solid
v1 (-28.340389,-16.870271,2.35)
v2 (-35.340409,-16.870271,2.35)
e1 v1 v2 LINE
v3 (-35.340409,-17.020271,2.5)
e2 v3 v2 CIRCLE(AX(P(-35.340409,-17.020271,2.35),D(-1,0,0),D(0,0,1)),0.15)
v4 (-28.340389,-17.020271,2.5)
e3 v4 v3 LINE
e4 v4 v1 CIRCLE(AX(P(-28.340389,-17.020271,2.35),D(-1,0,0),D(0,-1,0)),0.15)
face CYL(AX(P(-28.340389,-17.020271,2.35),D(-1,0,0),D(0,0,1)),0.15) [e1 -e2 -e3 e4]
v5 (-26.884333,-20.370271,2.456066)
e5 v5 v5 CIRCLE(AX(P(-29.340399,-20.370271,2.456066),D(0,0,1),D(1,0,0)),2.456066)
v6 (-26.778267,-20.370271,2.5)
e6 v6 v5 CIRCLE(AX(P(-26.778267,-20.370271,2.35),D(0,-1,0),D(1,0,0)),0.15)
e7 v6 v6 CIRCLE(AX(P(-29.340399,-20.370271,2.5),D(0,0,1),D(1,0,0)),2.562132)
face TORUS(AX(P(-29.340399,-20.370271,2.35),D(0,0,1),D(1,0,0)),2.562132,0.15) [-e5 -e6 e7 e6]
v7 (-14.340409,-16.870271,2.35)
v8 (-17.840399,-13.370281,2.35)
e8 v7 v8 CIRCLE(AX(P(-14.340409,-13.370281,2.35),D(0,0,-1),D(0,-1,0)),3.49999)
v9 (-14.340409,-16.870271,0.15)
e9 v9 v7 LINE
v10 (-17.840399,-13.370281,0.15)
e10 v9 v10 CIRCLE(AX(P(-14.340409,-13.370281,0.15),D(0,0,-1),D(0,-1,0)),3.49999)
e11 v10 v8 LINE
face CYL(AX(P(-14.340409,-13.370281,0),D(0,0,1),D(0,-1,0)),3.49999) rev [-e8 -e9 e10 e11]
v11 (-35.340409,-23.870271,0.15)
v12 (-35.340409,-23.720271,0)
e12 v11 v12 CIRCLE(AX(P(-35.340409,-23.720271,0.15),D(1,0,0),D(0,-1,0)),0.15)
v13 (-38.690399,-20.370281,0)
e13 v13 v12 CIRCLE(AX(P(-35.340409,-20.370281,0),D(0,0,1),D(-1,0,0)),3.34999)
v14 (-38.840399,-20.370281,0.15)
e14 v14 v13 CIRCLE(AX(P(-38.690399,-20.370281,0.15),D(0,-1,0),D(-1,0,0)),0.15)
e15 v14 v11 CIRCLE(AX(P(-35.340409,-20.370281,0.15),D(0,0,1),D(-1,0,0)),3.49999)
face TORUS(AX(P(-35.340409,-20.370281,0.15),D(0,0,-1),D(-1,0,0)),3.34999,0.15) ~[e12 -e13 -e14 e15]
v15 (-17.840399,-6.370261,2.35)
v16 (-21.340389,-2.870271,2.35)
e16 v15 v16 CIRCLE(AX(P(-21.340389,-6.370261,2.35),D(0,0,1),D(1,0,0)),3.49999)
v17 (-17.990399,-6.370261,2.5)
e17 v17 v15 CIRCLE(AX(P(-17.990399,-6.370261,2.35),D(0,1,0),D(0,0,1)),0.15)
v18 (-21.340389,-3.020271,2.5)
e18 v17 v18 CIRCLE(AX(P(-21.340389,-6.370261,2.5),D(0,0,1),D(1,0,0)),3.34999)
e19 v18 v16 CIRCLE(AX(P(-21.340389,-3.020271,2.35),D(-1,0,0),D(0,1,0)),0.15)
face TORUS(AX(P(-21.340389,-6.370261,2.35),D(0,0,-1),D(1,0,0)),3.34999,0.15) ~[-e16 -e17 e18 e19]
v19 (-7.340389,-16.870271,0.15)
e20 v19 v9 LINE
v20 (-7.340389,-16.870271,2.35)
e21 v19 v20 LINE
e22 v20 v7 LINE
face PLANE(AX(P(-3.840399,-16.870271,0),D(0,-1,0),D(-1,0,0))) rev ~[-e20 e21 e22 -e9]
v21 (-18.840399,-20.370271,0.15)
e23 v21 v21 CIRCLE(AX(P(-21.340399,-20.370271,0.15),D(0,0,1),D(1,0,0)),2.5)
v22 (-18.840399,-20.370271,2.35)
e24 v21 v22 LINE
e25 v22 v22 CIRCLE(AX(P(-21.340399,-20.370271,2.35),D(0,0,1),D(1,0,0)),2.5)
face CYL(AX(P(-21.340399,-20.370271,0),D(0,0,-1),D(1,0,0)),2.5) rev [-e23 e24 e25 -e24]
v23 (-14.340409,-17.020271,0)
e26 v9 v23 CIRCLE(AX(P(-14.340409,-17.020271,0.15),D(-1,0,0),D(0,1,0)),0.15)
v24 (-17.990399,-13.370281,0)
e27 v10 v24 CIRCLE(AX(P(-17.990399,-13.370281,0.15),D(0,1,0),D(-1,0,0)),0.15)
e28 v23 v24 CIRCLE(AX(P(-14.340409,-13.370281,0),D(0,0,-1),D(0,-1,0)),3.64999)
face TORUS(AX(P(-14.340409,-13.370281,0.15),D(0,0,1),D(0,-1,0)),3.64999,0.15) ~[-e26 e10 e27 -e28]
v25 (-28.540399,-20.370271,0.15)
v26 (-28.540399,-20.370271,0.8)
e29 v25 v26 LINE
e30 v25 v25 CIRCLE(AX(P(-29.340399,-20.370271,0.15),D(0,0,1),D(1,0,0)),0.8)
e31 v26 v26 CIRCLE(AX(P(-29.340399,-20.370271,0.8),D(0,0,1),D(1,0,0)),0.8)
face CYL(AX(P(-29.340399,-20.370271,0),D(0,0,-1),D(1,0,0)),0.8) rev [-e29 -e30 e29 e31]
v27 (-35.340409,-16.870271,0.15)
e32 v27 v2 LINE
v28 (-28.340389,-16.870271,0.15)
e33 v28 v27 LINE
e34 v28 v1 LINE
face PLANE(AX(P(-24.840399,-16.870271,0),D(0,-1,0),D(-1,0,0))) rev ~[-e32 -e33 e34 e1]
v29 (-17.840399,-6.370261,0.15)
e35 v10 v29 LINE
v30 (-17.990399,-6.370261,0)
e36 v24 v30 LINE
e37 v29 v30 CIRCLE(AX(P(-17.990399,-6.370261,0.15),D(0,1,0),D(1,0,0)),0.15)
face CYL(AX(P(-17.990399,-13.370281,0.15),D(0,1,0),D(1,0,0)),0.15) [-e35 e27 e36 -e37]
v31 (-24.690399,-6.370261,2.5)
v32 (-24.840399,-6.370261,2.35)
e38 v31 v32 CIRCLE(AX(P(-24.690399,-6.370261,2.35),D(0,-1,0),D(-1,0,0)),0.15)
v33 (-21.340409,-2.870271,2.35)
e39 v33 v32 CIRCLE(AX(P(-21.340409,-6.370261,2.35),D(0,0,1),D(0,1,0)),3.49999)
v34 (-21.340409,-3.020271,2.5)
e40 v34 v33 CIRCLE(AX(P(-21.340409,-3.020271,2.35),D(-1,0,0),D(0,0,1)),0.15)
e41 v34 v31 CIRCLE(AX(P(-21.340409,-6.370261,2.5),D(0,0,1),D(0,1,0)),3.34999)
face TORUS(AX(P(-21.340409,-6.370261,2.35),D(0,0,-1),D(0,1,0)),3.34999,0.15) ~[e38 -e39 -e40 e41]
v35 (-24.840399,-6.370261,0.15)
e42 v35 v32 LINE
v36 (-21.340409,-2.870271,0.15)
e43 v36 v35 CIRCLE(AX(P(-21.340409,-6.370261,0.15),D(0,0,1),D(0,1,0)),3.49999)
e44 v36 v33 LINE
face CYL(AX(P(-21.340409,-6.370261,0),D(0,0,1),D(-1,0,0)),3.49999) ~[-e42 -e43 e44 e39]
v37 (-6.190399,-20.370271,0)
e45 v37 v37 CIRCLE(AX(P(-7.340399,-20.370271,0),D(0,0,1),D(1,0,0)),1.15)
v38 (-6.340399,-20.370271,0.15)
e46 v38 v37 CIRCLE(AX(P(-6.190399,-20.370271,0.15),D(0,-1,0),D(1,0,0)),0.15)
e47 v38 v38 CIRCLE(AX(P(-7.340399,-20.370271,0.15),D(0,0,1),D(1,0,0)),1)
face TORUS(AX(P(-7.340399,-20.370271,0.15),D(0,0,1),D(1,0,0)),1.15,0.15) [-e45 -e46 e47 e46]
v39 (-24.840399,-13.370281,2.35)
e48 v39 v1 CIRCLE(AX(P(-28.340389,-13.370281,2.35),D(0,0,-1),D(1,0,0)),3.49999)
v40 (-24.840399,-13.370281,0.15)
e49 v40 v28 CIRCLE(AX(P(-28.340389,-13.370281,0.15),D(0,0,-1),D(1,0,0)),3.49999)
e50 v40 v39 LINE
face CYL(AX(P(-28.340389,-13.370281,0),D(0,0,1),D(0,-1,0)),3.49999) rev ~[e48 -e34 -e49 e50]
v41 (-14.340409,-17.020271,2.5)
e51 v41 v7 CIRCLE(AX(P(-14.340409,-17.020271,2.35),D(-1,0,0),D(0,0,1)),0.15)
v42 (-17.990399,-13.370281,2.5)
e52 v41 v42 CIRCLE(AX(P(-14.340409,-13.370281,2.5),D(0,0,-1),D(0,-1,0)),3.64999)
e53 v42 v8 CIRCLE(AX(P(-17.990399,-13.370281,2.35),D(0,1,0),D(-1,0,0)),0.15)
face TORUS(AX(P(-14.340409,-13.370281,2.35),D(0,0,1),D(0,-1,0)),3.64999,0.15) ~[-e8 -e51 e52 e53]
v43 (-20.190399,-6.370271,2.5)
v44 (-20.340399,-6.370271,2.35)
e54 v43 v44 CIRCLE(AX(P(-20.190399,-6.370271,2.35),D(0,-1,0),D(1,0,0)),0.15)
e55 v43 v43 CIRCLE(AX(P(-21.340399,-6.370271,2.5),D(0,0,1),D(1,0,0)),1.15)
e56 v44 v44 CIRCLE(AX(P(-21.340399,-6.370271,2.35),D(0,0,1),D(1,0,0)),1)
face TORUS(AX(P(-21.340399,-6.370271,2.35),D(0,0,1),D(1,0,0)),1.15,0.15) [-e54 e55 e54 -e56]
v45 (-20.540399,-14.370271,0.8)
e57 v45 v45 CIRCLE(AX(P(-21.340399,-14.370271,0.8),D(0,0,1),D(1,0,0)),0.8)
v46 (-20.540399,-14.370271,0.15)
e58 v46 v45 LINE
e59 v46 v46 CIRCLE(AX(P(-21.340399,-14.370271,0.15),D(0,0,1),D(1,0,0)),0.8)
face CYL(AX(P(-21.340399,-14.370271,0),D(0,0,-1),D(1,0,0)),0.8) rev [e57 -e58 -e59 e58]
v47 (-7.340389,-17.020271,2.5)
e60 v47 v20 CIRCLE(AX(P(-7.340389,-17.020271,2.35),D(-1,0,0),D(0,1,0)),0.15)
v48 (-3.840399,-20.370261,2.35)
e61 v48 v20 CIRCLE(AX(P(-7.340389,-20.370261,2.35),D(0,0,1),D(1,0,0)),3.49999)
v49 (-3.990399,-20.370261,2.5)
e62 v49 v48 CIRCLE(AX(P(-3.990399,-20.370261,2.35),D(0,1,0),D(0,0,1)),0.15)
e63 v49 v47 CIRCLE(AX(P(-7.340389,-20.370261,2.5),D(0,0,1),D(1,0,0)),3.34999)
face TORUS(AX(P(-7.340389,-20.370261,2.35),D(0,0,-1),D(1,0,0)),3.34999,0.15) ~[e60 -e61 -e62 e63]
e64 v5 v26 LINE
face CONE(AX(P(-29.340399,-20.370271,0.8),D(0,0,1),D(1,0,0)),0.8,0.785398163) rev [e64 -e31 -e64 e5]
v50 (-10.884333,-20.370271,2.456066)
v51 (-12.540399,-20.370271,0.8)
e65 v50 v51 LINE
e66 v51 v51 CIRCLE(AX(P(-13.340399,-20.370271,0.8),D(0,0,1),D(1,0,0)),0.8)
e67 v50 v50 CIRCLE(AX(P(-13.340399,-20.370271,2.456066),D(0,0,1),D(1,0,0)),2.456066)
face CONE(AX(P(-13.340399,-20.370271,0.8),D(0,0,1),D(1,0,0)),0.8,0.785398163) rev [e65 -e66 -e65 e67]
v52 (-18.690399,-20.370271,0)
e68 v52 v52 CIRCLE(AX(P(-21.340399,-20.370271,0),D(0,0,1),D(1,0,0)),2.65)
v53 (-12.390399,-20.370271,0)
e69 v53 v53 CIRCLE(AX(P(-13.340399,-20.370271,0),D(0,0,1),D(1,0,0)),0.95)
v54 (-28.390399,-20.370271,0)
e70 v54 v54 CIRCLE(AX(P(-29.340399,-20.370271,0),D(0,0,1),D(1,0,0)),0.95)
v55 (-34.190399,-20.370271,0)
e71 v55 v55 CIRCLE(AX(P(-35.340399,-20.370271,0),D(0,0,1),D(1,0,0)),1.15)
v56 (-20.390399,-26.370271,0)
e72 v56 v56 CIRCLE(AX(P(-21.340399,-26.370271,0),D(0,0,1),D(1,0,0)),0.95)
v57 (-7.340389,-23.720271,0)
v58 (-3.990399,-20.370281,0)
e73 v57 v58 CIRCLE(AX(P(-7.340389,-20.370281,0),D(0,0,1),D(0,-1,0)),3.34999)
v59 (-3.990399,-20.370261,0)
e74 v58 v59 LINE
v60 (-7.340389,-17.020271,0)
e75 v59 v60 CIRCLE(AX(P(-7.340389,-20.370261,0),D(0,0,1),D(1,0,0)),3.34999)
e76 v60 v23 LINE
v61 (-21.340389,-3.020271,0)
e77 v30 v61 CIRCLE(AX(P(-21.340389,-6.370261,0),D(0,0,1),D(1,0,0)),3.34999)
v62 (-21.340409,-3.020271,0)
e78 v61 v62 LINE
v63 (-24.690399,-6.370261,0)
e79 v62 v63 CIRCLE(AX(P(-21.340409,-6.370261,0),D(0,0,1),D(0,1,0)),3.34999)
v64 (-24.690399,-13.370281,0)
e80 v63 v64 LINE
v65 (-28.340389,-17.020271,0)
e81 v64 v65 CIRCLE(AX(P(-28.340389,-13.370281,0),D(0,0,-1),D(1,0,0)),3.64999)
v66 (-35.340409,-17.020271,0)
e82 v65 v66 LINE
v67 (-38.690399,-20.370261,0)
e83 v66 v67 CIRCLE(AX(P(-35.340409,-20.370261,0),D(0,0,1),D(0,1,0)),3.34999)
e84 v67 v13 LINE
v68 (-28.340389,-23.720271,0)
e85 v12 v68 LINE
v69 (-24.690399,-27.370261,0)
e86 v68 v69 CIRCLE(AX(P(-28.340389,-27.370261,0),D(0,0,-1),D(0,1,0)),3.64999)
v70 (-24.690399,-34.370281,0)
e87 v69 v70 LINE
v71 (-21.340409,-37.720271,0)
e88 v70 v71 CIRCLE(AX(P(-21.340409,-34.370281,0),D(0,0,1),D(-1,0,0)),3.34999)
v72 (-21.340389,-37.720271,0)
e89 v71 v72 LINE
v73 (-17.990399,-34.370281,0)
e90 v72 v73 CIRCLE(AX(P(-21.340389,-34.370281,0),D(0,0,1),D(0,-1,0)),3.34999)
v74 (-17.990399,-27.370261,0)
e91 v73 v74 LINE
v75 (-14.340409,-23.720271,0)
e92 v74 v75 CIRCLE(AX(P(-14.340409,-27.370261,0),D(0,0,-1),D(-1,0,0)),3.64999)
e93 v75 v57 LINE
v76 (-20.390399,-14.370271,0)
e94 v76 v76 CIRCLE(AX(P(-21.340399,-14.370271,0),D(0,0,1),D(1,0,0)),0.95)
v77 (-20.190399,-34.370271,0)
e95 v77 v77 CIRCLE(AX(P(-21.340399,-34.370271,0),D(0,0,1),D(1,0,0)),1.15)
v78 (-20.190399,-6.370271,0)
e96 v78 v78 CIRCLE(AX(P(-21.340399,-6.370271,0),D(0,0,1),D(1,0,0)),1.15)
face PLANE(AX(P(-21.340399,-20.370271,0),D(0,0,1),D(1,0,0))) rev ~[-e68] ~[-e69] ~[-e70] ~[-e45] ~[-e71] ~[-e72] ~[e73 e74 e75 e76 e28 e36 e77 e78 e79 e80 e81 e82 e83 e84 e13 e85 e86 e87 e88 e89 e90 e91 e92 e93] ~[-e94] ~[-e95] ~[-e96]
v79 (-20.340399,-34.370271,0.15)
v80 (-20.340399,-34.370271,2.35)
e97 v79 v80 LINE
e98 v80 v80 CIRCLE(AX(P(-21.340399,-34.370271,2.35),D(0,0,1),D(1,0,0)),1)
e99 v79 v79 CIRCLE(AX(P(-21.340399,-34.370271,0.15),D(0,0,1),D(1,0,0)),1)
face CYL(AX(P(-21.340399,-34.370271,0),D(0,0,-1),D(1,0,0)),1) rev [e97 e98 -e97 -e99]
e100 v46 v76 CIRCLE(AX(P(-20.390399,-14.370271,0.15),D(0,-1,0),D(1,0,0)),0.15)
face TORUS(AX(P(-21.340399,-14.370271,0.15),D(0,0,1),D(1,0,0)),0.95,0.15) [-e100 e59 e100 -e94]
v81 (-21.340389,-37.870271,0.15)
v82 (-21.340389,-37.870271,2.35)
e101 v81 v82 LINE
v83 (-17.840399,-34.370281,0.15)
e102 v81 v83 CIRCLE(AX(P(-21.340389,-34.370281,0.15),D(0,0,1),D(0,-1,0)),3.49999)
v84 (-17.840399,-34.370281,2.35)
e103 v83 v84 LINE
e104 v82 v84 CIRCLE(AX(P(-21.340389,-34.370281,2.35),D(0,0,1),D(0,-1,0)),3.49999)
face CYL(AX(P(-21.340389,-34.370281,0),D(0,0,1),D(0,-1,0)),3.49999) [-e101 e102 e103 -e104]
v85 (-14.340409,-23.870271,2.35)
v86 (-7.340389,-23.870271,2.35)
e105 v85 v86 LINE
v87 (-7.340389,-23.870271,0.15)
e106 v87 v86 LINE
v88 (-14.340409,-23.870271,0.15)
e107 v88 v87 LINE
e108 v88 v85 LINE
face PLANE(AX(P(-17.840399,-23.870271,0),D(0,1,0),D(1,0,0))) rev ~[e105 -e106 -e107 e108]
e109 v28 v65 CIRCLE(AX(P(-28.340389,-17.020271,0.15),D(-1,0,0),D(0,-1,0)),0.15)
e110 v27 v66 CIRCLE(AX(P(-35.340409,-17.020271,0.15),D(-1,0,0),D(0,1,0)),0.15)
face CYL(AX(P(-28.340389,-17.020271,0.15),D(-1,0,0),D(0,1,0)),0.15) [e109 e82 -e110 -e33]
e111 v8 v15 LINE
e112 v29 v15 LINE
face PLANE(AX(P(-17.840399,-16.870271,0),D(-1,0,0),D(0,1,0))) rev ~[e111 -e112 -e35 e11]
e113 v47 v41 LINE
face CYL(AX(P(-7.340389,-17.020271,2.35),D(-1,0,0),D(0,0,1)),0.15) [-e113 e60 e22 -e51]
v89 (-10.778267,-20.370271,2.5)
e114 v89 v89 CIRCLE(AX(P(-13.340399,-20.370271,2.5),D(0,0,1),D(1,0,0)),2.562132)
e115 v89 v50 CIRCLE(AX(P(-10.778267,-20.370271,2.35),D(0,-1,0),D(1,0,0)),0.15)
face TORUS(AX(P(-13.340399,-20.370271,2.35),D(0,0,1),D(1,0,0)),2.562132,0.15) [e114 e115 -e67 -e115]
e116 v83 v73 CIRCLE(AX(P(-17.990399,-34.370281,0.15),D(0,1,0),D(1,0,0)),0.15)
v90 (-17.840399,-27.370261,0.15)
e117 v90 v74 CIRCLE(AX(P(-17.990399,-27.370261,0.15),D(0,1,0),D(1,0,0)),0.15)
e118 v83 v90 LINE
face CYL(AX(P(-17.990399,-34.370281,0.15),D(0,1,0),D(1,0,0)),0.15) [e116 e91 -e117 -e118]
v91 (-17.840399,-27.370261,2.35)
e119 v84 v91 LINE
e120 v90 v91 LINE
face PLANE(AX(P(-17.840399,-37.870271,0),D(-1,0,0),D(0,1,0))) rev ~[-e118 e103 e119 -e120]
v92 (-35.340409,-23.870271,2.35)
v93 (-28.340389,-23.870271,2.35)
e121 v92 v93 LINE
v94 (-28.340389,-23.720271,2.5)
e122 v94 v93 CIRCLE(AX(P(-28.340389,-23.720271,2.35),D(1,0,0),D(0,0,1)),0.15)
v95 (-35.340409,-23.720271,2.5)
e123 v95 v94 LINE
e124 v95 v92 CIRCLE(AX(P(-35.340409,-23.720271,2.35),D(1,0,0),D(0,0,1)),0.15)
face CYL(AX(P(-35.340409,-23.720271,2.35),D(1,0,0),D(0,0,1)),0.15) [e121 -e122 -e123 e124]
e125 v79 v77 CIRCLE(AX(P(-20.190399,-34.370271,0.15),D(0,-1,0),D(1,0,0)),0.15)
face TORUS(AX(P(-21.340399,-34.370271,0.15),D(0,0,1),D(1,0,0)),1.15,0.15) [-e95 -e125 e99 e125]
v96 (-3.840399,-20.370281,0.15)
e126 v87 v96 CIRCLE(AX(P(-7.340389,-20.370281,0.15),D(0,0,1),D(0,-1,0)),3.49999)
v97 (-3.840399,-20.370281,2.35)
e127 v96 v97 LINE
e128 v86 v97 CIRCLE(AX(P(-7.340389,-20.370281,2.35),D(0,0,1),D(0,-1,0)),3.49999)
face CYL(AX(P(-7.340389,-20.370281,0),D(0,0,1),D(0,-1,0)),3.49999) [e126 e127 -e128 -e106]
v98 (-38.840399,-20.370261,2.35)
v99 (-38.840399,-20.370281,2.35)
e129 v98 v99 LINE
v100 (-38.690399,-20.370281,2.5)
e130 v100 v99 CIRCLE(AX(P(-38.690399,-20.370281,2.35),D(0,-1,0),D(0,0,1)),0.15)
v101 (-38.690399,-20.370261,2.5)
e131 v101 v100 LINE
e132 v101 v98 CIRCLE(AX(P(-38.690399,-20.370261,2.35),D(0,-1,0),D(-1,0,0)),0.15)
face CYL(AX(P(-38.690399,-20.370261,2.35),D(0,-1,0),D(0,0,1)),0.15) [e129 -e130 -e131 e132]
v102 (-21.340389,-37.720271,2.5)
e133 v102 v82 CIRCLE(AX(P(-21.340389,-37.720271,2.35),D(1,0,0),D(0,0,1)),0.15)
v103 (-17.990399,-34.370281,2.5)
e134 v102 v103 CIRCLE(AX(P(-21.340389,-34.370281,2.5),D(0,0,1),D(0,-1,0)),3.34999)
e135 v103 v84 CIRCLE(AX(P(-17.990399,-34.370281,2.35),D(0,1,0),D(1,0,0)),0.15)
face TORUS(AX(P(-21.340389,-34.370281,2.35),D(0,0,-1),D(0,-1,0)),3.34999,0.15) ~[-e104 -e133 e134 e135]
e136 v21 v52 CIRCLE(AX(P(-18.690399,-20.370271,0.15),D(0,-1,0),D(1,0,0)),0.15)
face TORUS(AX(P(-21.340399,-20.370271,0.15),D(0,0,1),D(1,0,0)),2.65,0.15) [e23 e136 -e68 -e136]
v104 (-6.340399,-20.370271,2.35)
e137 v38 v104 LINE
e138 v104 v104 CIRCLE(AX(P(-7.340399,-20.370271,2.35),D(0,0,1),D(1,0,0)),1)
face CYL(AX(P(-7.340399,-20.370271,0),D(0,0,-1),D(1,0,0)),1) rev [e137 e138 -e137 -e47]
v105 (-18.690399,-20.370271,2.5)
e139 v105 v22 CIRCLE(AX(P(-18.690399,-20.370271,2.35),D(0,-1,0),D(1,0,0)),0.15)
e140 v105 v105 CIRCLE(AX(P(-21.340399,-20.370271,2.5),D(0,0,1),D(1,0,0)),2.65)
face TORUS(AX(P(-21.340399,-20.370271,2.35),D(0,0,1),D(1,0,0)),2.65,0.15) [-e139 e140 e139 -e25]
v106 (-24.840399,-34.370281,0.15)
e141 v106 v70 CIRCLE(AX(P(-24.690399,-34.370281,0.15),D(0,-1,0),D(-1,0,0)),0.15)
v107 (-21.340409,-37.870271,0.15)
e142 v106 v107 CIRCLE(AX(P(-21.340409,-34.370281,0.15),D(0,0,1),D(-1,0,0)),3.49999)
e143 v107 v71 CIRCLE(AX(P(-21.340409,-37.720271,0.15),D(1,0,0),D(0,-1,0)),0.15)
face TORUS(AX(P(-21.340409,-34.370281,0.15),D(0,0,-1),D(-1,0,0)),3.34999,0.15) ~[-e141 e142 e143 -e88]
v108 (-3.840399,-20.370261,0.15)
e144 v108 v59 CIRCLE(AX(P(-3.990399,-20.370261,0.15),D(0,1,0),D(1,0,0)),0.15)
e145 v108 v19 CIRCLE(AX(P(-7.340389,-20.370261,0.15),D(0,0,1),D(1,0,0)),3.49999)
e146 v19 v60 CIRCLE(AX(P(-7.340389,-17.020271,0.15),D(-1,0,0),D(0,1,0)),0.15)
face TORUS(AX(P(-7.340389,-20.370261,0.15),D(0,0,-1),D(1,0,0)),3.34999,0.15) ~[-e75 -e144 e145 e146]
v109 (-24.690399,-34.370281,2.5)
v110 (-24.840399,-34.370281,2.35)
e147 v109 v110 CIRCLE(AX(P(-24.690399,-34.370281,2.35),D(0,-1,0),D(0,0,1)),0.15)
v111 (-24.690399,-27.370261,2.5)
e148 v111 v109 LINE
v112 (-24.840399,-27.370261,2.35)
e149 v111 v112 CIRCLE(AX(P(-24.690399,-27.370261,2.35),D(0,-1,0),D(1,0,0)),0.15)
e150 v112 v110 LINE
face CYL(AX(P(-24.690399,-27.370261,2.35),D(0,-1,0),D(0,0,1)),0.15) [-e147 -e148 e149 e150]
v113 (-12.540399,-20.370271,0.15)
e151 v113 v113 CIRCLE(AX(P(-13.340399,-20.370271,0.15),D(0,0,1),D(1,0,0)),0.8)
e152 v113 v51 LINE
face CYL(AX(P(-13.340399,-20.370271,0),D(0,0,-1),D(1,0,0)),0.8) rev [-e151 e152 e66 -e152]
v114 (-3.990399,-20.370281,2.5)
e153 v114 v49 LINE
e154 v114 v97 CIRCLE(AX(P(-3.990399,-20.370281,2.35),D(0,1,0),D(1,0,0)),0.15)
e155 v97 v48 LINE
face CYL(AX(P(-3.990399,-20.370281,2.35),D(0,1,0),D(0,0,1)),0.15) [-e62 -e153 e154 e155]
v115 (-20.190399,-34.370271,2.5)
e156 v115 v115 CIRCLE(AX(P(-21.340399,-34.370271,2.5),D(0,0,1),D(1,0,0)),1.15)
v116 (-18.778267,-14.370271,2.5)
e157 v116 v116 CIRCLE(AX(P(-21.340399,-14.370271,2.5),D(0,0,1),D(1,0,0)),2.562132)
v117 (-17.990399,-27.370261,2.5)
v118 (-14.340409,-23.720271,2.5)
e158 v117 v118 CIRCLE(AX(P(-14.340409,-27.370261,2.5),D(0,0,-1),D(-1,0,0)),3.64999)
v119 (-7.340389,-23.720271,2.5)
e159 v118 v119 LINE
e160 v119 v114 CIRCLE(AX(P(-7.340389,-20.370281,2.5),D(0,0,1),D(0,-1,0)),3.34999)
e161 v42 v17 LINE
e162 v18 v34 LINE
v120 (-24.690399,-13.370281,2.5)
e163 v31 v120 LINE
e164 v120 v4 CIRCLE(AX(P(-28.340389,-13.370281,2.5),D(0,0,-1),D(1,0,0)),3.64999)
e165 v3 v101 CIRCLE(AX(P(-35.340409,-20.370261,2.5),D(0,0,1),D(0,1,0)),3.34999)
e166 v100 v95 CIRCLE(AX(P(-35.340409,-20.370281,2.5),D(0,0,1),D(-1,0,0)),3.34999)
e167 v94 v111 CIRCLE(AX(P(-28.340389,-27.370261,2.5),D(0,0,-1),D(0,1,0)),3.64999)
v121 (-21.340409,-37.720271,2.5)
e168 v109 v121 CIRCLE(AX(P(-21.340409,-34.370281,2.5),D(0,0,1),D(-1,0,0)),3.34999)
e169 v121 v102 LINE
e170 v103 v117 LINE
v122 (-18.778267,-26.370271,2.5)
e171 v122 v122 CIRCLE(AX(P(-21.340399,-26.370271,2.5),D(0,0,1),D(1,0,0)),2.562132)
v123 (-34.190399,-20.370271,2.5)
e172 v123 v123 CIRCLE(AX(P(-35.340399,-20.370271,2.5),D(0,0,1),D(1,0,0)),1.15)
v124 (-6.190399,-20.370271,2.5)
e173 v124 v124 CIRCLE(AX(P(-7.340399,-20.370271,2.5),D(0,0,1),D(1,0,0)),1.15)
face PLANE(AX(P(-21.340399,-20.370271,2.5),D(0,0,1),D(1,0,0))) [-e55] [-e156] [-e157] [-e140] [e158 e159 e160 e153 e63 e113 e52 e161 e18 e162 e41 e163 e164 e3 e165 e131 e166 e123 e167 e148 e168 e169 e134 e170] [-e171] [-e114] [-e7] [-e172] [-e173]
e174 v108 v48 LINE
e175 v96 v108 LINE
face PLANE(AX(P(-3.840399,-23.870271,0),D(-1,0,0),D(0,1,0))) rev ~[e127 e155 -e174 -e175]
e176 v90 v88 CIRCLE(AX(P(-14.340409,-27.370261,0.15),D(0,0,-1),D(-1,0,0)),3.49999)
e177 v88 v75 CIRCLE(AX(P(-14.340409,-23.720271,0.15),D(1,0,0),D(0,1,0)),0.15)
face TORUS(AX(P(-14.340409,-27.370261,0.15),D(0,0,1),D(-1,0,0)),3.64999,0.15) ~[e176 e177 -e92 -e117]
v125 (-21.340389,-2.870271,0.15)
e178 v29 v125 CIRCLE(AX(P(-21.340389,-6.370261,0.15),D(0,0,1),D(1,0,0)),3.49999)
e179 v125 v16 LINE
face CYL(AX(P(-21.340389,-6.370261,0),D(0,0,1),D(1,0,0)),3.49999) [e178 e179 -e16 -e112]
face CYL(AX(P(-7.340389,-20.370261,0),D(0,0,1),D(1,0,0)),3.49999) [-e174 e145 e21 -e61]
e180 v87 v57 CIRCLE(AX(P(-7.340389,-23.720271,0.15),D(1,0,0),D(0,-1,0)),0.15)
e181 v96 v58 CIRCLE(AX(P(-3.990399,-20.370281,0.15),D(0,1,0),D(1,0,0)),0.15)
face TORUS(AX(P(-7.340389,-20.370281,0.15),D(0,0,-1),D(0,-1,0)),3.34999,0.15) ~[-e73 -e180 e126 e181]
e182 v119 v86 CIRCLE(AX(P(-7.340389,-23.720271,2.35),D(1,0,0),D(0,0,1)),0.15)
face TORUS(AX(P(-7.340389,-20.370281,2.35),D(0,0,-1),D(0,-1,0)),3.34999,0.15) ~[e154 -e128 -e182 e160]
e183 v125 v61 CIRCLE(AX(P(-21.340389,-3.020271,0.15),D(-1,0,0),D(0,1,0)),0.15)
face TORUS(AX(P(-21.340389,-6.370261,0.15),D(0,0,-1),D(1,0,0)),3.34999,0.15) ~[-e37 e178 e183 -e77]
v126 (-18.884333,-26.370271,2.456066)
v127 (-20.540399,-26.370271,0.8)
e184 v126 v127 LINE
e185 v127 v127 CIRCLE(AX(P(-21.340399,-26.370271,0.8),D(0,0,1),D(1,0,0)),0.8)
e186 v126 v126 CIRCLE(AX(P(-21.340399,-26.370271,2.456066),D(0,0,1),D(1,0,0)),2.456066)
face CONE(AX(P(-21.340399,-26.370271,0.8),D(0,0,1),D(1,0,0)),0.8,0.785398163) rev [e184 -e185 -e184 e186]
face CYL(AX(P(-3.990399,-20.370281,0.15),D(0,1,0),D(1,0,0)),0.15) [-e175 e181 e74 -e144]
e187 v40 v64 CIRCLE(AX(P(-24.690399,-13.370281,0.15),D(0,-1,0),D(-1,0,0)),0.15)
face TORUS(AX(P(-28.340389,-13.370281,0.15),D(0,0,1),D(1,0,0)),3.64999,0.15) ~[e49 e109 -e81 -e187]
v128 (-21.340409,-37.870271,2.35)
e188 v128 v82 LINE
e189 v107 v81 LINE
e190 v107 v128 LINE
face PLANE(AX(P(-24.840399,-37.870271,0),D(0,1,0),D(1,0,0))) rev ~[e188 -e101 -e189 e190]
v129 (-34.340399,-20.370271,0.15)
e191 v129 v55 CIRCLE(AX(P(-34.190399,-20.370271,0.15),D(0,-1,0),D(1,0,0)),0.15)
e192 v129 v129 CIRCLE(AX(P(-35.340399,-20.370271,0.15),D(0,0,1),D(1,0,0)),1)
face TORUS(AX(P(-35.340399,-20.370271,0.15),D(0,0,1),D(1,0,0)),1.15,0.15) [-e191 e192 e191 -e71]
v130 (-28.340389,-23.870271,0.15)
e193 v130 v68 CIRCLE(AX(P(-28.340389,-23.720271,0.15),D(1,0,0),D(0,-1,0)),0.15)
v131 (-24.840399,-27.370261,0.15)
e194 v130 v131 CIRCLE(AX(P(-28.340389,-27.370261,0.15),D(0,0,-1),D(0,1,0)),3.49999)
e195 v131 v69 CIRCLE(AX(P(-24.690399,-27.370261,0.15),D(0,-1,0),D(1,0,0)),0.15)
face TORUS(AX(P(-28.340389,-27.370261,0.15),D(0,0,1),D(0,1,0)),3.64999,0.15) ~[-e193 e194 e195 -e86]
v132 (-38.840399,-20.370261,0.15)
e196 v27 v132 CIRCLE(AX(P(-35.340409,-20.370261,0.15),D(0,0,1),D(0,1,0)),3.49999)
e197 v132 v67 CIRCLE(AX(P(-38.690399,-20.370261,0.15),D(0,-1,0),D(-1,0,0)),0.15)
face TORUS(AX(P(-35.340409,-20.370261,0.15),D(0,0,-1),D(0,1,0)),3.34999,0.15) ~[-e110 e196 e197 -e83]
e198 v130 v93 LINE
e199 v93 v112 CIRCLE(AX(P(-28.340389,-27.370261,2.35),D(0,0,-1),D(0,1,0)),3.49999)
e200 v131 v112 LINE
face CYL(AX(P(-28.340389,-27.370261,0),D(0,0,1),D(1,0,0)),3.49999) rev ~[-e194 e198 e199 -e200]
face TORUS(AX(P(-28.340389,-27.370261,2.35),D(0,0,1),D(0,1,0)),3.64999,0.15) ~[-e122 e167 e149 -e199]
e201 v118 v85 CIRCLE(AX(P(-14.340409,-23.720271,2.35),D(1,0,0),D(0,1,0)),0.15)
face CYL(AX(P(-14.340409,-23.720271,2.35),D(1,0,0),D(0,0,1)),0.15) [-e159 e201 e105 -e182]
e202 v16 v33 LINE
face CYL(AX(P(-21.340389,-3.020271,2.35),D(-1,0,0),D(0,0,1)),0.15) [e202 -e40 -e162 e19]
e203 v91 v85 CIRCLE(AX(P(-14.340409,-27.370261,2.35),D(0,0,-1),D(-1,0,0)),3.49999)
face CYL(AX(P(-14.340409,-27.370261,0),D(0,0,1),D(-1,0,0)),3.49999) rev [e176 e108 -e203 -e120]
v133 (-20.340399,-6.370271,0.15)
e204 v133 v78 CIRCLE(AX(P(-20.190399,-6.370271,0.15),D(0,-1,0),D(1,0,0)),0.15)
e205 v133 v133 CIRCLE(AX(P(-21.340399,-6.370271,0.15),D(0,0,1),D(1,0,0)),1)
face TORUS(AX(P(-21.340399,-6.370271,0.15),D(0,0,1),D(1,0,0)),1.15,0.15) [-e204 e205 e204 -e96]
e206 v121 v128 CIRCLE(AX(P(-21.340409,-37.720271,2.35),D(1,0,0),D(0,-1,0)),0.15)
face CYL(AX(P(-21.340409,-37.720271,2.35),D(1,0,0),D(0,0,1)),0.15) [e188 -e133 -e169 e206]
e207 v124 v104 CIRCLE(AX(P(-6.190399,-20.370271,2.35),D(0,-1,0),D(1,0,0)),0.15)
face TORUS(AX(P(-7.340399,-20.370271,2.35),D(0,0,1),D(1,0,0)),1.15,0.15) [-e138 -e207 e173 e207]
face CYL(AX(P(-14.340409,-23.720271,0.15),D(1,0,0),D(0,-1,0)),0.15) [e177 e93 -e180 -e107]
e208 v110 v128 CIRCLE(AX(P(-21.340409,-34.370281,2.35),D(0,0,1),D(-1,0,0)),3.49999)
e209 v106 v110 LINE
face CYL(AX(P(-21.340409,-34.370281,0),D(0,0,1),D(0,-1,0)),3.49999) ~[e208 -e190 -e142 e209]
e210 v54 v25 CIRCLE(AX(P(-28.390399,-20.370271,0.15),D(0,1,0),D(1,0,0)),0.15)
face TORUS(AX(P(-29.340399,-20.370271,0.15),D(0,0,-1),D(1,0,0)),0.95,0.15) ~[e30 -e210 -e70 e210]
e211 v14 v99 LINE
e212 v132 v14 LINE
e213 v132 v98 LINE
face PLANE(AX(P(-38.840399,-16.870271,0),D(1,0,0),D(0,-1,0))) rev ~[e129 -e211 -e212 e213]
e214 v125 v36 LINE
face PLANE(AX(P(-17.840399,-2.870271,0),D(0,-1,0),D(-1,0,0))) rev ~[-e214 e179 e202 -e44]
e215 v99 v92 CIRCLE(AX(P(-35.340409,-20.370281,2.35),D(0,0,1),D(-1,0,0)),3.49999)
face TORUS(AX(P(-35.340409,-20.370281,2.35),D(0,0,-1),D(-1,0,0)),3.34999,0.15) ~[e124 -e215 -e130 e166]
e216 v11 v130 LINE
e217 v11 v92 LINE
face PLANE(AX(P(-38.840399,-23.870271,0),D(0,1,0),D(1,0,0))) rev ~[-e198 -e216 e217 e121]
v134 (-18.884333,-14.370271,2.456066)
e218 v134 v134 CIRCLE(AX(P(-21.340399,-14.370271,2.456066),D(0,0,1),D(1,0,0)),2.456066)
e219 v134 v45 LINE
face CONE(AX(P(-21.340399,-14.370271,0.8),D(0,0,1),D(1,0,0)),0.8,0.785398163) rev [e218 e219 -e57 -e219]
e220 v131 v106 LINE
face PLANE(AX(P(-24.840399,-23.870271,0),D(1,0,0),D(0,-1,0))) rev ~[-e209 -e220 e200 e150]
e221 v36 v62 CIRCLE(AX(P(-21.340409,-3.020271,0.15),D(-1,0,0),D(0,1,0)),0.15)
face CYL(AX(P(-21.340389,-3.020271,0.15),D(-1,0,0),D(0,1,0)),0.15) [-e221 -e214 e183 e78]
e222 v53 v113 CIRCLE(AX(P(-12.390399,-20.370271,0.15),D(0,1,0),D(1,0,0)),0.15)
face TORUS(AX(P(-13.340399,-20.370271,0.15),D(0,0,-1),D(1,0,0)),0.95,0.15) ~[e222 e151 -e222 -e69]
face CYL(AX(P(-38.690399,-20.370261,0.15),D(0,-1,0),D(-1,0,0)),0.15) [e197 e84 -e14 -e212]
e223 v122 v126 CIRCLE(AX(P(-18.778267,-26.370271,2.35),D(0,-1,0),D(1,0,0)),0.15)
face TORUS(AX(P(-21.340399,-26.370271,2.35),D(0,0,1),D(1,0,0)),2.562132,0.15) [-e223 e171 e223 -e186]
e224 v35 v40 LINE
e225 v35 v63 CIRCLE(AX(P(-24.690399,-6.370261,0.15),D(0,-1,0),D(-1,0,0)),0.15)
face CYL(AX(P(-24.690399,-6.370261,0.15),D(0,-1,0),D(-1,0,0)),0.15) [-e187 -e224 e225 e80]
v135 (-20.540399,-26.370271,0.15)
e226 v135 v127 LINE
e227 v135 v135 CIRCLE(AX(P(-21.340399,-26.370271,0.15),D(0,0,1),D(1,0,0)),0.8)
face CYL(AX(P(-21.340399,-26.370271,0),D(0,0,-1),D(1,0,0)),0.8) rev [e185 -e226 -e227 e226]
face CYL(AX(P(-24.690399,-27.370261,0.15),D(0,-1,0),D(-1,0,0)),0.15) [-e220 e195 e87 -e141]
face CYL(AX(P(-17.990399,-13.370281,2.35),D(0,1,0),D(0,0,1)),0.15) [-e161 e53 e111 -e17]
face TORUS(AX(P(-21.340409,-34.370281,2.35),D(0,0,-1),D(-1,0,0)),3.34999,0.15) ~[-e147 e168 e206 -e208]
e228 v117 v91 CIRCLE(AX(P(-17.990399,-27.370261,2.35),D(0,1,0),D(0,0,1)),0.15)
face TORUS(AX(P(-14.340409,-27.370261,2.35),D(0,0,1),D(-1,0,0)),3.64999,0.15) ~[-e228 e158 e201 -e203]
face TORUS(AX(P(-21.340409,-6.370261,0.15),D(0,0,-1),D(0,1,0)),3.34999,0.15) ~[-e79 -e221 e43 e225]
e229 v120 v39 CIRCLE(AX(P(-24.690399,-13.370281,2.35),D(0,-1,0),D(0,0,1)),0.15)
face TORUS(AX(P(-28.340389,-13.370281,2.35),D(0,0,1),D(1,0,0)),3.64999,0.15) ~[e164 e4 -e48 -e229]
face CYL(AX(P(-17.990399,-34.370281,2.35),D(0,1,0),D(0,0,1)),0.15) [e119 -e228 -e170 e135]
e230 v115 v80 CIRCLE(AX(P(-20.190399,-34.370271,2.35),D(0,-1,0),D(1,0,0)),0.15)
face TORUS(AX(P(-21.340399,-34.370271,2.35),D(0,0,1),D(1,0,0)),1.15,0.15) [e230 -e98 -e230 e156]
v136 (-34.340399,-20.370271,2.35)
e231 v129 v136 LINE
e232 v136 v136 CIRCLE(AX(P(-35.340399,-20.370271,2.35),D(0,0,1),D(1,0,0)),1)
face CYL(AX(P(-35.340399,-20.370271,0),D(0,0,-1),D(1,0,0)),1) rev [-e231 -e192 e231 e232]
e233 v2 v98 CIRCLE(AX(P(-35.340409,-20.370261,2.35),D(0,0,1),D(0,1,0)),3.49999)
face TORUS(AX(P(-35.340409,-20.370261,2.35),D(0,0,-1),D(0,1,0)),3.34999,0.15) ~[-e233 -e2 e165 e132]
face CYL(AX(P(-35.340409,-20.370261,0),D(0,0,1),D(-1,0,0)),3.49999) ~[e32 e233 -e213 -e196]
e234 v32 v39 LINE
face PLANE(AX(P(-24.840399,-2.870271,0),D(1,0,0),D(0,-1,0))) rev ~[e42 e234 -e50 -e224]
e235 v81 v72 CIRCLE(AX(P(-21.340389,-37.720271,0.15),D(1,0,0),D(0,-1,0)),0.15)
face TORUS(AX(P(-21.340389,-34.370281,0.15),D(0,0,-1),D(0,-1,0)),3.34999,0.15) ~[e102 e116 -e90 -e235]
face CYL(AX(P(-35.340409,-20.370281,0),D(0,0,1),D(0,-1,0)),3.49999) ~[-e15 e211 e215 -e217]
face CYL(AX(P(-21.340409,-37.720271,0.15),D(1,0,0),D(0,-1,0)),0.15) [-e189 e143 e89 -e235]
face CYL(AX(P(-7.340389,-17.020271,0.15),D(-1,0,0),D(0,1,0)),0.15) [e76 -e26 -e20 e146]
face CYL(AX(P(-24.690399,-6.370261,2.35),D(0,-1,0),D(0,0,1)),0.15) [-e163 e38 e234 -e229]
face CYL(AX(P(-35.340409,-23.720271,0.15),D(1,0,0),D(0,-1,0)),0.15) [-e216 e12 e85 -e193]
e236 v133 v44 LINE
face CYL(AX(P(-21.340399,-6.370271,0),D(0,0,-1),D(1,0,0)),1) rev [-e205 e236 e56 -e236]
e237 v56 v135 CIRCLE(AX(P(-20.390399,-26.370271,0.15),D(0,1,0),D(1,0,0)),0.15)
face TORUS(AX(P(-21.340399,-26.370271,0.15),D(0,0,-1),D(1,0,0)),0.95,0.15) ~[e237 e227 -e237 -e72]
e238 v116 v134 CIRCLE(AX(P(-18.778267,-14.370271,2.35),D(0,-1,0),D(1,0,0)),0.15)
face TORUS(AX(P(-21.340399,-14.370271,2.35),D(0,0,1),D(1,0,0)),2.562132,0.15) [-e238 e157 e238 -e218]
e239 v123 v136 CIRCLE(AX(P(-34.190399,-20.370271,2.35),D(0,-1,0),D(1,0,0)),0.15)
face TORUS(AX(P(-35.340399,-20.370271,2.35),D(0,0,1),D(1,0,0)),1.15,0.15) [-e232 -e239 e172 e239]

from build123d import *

# Parameters (mm, degrees)
F0_R     = 1
F0_R_2   = 0.8
F0_R_3   = 2.5
F1_DEPTH = 2.5
F2_R     = 3.49999
F3_SIZE  = 1.7
F4_R     = 0.15


# Not quite as in the source:
# - a fillet or chamfer is up to 0.001 mm smaller than in the source, because OpenCascade refuses the exact size


with BuildPart() as f1:
    # F0 (on Top) → F1 (new body)
    with BuildSketch(Plane.XY):
        Polygon((-24.8403990492, -37.8702705037), (-17.8403990492, -37.8702705037), (-17.8403990492, -23.8702705037), (-3.8403990492, -23.8702705037), (-3.8403990492, -16.8702705037), (-17.8403990492, -16.8702705037), (-17.8403990492, -2.8702705037), (-24.8403990492, -2.8702705037), (-24.8403990492, -16.8702705037), (-38.8403990492, -16.8702705037), (-38.8403990492, -23.8702705037), (-24.8403990492, -23.8702705037), align=None)
        with Locations((-21.3403990492, -34.3702705037)):
            Circle(F0_R, mode=Mode.SUBTRACT)
        with Locations((-21.3403990492, -26.3702705037)):
            Circle(F0_R_2, mode=Mode.SUBTRACT)
        with Locations((-35.3403990492, -20.3702705037)):
            Circle(F0_R, mode=Mode.SUBTRACT)
        with Locations((-29.3403990492, -20.3702705037)):
            Circle(F0_R_2, mode=Mode.SUBTRACT)
        with Locations((-21.3403990492, -14.3702705037)):
            Circle(F0_R_2, mode=Mode.SUBTRACT)
        with Locations((-21.3403990492, -6.3702705037)):
            Circle(F0_R, mode=Mode.SUBTRACT)
        with Locations((-21.3403990492, -20.3702705037)):
            Circle(F0_R_3, mode=Mode.SUBTRACT)
        with Locations((-13.3403990492, -20.3702705037)):
            Circle(F0_R_2, mode=Mode.SUBTRACT)
        with Locations((-7.3403990492, -20.3702705037)):
            Circle(F0_R, mode=Mode.SUBTRACT)
    extrude(amount=F1_DEPTH)

    # F2 (radius 3.5 in the source; OpenCascade refuses exactly that, so slightly less here)
    f2_edges = [f1.edges().sort_by_distance(p)[0] for p in [
        (-24.840399, -2.870271, 1.25),
        (-17.840399, -2.870271, 1.25),
        (-3.840399, -16.870271, 1.25),
        (-3.840399, -23.870271, 1.25),
        (-17.840399, -37.870271, 1.25),
        (-24.840399, -37.870271, 1.25),
        (-38.840399, -23.870271, 1.25),
        (-38.840399, -16.870271, 1.25),
        (-24.840399, -23.870271, 1.25),
        (-17.840399, -23.870271, 1.25),
        (-17.840399, -16.870271, 1.25),
        (-24.840399, -16.870271, 1.25),
    ]]
    fillet(f2_edges, radius=F2_R)

    # F3
    f3_edges = [f1.edges().sort_by_distance(p)[0] for p in [
        (-22.140399, -14.370271, 2.5),
        (-14.140399, -20.370271, 2.5),
        (-22.140399, -26.370271, 2.5),
        (-30.140399, -20.370271, 2.5),
    ]]
    chamfer(f3_edges, length=F3_SIZE)

    # F4
    f4_edges = [f1.edges().sort_by_distance(p)[0] for p in [
        (-23.840399, -14.370271, 2.5),
        (-31.840399, -23.870271, 2.5),
        (-37.815276, -22.845147, 2.5),
        (-25.865522, -24.895394, 2.5),
        (-38.840399, -20.370271, 2.5),
        (-24.840399, -30.870271, 2.5),
        (-37.815276, -17.895394, 2.5),
        (-23.815276, -36.845147, 2.5),
        (-31.840399, -16.870271, 2.5),
        (-21.340399, -37.870271, 2.5),
        (-25.865522, -15.845147, 2.5),
        (-18.865522, -36.845147, 2.5),
        (-24.840399, -9.870271, 2.5),
        (-17.840399, -30.870271, 2.5),
        (-23.815276, -3.895394, 2.5),
        (-16.815276, -24.895394, 2.5),
        (-21.340399, -2.870271, 2.5),
        (-10.840399, -23.870271, 2.5),
        (-18.865522, -3.895394, 2.5),
        (-4.865522, -22.845147, 2.5),
        (-17.840399, -9.870271, 2.5),
        (-3.840399, -20.370271, 2.5),
        (-16.815276, -15.845147, 2.5),
        (-4.865522, -17.895394, 2.5),
        (-10.840399, -16.870271, 2.5),
        (-22.340399, -34.370271, 2.5),
        (-36.340399, -20.370271, 2.5),
        (-22.340399, -6.370271, 2.5),
        (-23.840399, -20.370271, 2.5),
        (-8.340399, -20.370271, 2.5),
        (-15.840399, -20.370271, 2.5),
        (-23.840399, -26.370271, 2.5),
        (-31.840399, -20.370271, 2.5),
        (-31.840399, -23.870271, 0),
        (-37.815276, -22.845147, 0),
        (-25.865522, -24.895394, 0),
        (-38.840399, -20.370271, 0),
        (-24.840399, -30.870271, 0),
        (-37.815276, -17.895394, 0),
        (-23.815276, -36.845147, 0),
        (-31.840399, -16.870271, 0),
        (-21.340399, -37.870271, 0),
        (-25.865522, -15.845147, 0),
        (-18.865522, -36.845147, 0),
        (-24.840399, -9.870271, 0),
        (-17.840399, -30.870271, 0),
        (-23.815276, -3.895394, 0),
        (-16.815276, -24.895394, 0),
        (-21.340399, -2.870271, 0),
        (-10.840399, -23.870271, 0),
        (-18.865522, -3.895394, 0),
        (-4.865522, -22.845147, 0),
        (-17.840399, -9.870271, 0),
        (-3.840399, -20.370271, 0),
        (-16.815276, -15.845147, 0),
        (-4.865522, -17.895394, 0),
        (-10.840399, -16.870271, 0),
        (-22.340399, -34.370271, 0),
        (-22.140399, -26.370271, 0),
        (-36.340399, -20.370271, 0),
        (-30.140399, -20.370271, 0),
        (-22.140399, -14.370271, 0),
        (-22.340399, -6.370271, 0),
        (-23.840399, -20.370271, 0),
        (-14.140399, -20.370271, 0),
        (-8.340399, -20.370271, 0),
    ]]
    fillet(f4_edges, radius=F4_R)


solid = f1.part
